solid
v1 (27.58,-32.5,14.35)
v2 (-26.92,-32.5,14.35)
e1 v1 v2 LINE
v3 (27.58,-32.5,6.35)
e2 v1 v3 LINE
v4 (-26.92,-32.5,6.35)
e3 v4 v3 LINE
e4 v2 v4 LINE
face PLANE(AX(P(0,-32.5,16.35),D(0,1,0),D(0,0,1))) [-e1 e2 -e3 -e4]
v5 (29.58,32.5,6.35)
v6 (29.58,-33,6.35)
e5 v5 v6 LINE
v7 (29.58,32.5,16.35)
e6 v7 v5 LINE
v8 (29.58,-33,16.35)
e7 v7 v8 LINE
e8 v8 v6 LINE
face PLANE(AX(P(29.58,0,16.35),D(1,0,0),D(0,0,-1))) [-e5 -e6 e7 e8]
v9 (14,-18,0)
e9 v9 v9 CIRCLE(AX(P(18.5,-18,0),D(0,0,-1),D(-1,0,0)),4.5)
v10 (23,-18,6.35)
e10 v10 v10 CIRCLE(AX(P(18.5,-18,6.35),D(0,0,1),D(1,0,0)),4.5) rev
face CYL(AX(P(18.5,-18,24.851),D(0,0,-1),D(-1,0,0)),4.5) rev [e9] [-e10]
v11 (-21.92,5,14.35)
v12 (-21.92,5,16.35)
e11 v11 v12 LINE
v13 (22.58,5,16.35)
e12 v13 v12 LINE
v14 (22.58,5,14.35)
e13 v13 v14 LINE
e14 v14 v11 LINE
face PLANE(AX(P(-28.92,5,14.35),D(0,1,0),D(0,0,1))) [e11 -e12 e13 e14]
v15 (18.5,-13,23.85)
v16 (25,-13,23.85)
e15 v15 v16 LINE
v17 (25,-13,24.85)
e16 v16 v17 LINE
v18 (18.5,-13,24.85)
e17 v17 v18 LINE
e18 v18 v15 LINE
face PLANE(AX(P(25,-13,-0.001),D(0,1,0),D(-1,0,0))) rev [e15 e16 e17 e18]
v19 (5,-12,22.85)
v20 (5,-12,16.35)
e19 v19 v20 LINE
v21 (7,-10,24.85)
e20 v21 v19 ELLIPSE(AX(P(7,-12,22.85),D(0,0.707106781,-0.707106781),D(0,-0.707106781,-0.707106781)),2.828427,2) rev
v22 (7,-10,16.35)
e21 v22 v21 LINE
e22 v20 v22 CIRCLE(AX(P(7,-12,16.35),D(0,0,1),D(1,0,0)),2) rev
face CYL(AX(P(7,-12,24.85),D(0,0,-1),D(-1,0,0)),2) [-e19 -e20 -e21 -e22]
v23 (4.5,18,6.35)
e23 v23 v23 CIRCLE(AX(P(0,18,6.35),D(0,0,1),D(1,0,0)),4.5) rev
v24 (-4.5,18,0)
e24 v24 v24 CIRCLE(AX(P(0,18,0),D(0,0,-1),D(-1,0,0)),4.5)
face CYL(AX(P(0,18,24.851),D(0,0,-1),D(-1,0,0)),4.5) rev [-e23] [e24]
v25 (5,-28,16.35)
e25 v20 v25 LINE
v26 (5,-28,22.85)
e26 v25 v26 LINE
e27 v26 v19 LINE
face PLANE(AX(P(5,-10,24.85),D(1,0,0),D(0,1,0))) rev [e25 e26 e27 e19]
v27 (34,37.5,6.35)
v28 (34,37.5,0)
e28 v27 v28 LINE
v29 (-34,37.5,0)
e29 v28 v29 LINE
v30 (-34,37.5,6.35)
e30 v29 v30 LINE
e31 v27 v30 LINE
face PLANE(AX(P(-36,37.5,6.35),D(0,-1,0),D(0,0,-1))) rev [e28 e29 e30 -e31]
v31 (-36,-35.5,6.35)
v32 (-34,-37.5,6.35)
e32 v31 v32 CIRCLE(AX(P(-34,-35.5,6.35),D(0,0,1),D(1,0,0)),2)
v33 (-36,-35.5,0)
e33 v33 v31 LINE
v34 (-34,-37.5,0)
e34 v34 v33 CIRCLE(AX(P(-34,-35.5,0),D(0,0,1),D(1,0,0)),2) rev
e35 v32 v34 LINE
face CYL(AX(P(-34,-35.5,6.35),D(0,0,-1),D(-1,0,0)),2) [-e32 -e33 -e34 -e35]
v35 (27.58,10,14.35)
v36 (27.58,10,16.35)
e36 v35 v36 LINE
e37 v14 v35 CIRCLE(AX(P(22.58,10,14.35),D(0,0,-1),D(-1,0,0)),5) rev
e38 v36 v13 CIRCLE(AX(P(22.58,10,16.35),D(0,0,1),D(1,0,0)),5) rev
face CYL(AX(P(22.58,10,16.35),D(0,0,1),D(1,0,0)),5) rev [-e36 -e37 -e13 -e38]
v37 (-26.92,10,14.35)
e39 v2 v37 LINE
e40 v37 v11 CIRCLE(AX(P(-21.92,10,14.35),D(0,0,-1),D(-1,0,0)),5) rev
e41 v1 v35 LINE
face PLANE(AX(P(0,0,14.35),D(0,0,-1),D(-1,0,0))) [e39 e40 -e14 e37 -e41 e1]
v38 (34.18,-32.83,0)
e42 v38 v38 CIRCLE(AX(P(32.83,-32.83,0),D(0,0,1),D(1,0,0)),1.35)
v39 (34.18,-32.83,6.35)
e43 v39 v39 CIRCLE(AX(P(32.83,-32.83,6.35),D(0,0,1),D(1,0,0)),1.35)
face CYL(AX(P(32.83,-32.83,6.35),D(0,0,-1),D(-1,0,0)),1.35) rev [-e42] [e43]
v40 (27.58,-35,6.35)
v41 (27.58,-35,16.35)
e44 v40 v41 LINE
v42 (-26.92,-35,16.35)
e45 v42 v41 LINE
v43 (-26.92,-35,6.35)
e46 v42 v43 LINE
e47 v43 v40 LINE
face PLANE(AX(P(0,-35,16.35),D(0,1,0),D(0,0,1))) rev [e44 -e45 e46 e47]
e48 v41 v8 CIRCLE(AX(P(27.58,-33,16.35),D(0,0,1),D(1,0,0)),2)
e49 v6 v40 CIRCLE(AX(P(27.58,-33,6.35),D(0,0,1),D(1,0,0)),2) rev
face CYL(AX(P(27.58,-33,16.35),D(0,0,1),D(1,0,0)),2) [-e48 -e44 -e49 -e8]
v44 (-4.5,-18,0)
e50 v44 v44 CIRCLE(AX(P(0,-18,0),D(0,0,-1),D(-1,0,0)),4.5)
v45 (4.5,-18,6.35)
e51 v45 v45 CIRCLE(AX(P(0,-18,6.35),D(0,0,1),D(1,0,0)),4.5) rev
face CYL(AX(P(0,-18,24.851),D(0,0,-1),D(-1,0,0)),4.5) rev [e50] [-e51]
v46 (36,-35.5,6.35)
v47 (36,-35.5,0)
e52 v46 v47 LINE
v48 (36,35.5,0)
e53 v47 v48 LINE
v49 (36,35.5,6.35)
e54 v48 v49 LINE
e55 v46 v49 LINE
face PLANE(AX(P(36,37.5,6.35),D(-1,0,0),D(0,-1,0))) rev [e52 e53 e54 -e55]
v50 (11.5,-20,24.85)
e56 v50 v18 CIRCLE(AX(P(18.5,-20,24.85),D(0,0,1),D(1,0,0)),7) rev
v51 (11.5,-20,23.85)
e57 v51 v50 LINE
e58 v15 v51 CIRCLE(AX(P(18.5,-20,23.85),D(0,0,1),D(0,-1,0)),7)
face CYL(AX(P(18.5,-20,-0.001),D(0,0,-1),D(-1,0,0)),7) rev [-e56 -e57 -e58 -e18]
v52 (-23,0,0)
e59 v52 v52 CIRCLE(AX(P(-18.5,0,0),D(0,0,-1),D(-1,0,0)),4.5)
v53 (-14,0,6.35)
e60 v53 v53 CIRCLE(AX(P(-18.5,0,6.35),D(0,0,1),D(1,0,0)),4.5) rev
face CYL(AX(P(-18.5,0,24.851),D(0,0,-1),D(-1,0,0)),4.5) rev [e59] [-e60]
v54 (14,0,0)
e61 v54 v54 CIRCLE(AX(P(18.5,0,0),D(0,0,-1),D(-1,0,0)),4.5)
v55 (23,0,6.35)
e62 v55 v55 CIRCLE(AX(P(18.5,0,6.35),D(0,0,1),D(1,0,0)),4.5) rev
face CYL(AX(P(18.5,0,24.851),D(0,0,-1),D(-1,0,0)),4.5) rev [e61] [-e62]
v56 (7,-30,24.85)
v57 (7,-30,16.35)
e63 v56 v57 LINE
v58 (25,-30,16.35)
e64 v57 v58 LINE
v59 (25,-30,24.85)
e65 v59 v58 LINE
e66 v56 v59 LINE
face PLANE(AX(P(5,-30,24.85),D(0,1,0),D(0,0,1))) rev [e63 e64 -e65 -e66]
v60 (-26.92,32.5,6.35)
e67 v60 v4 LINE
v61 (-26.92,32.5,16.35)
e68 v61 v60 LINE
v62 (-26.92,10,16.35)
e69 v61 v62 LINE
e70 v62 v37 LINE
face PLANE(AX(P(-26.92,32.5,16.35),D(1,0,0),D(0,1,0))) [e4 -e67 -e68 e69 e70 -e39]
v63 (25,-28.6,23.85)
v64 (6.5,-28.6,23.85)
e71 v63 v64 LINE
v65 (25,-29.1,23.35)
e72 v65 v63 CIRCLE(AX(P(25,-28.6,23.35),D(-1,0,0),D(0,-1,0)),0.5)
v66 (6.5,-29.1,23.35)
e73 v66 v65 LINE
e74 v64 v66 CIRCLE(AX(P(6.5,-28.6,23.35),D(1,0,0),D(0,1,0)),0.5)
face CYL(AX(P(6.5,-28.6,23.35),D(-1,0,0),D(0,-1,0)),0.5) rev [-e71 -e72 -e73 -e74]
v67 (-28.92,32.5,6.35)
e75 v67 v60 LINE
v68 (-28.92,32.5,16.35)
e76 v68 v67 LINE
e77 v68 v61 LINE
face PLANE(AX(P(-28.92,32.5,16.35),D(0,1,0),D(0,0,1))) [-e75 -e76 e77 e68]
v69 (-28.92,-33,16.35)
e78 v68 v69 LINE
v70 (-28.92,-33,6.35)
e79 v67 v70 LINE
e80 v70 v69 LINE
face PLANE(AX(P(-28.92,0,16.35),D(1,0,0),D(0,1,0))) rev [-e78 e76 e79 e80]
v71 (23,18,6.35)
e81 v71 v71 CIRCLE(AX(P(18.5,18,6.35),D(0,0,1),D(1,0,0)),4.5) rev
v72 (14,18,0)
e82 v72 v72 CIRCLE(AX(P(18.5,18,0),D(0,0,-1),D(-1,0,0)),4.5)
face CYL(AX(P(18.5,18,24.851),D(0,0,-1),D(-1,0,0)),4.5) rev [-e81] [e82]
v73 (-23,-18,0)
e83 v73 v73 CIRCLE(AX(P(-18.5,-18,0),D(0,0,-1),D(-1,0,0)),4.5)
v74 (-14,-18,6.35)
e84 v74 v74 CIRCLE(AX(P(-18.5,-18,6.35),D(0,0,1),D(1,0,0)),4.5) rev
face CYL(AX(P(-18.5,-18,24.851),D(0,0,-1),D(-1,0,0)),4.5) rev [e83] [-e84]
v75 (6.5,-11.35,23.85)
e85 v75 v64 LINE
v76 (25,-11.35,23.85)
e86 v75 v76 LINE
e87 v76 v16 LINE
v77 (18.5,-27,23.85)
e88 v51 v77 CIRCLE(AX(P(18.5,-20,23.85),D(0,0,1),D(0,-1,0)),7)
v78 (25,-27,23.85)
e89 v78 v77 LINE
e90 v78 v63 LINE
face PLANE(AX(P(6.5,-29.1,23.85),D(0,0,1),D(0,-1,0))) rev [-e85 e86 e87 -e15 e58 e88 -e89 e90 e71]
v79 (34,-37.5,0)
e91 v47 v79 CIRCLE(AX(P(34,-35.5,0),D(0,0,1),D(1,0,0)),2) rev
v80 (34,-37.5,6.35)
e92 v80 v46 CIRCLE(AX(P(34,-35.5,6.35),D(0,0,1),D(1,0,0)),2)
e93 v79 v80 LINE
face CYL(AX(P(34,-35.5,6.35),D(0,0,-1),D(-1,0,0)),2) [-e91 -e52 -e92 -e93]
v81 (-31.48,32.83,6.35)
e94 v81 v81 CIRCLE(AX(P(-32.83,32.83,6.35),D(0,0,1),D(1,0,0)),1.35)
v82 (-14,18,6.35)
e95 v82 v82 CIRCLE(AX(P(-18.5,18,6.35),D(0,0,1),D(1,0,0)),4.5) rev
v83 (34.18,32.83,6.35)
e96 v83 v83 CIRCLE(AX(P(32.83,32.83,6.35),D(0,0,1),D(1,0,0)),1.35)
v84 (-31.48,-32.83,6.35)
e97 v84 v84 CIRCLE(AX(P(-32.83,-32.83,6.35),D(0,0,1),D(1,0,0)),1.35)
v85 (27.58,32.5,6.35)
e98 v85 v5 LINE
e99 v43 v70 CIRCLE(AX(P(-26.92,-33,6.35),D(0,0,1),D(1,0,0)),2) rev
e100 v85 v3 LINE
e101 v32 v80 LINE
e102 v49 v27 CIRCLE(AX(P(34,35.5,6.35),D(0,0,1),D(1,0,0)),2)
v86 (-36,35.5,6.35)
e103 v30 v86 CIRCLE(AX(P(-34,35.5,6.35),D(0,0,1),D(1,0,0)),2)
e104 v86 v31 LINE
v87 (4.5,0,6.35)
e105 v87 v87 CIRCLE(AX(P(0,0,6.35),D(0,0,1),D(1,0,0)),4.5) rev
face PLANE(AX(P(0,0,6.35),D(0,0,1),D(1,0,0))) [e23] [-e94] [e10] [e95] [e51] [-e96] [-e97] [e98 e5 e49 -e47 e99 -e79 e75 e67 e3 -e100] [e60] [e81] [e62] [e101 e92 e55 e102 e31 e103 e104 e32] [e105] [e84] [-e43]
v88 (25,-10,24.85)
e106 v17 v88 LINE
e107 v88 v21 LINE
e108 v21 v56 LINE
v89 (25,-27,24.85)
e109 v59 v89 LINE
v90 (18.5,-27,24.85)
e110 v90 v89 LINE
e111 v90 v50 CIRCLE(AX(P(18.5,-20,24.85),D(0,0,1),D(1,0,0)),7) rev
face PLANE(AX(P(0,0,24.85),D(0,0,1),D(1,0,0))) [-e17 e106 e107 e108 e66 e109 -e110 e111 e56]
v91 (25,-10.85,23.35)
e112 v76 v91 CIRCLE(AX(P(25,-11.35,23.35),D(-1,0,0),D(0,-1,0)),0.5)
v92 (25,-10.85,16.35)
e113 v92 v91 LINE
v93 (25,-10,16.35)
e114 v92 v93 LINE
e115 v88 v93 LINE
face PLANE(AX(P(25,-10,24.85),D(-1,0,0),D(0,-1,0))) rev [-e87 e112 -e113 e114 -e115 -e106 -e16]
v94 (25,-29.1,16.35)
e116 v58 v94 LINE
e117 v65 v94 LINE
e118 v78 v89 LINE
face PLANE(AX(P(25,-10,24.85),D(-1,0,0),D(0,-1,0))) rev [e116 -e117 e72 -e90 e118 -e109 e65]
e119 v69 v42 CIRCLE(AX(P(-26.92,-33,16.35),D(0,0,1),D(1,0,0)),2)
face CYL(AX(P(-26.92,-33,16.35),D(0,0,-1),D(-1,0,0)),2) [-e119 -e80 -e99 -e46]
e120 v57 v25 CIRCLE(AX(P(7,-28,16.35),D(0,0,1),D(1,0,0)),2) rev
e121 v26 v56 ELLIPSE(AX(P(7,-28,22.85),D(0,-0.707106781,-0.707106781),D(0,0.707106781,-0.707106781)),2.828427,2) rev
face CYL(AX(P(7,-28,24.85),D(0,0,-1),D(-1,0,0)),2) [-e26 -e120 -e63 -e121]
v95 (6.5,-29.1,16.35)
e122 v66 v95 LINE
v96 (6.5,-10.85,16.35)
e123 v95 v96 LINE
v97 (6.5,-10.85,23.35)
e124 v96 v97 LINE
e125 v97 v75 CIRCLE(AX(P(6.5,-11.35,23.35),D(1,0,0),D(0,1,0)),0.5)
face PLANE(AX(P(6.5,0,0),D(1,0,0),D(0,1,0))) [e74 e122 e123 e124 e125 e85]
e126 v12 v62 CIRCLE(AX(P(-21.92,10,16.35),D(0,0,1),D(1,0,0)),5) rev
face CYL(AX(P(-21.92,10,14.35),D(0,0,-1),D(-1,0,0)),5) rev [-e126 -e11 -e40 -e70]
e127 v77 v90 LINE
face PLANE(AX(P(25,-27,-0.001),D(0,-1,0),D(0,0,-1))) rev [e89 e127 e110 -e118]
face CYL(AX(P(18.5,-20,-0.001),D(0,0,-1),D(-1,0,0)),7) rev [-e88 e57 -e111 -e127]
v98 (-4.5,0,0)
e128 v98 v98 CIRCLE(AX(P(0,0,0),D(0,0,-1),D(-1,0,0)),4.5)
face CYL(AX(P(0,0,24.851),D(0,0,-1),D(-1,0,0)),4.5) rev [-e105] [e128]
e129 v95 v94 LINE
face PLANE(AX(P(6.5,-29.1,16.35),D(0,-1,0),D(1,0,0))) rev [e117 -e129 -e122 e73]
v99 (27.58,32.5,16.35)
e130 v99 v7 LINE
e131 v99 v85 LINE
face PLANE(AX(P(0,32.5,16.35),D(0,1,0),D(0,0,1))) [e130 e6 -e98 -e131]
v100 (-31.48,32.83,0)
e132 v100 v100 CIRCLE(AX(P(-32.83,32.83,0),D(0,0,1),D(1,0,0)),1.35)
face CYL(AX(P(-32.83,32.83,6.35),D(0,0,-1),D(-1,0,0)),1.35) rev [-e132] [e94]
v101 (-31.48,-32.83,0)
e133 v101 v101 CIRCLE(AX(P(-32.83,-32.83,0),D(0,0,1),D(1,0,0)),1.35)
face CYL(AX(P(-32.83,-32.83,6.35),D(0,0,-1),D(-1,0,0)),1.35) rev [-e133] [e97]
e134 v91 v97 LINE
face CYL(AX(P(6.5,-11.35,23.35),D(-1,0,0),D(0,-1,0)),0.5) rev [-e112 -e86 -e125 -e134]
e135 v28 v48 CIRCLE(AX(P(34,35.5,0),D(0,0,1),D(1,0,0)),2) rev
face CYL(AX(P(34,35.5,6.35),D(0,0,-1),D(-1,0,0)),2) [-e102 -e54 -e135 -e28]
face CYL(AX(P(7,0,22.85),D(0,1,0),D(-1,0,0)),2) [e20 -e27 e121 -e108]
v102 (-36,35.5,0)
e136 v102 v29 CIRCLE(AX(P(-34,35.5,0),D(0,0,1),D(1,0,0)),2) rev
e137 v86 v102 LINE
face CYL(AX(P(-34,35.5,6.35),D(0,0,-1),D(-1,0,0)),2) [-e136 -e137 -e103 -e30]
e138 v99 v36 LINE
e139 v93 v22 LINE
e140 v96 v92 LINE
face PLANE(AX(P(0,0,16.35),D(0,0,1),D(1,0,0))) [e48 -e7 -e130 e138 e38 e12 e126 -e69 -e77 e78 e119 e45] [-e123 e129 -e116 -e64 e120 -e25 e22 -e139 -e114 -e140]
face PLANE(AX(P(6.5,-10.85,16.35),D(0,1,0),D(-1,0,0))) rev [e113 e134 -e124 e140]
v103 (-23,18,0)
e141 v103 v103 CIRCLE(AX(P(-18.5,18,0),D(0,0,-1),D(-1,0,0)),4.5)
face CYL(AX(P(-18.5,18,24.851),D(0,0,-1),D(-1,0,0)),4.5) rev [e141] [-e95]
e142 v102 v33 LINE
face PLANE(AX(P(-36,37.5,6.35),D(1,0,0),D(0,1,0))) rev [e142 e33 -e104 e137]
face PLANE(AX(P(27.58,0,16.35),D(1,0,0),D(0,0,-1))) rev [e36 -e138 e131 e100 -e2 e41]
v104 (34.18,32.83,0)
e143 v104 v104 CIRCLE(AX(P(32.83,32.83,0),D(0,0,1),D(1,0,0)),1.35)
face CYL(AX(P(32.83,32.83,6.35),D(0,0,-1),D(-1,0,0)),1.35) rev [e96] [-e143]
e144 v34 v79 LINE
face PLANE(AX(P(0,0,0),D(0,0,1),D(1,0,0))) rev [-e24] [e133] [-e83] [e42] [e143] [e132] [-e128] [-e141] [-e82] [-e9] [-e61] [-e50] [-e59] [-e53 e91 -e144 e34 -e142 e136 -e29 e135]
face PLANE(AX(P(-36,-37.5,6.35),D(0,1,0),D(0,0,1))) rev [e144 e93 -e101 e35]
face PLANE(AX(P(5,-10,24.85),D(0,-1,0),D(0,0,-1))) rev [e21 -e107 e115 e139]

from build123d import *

# Parameters (mm, degrees)
SKETCH1_W           = 72
SKETCH1_H           = 75
SKETCH1_R           = 1.35
BOSS_EXTRUDE1_DEPTH = 6.35
BOSS_EXTRUDE2_DEPTH = 10
SKETCH3_W           = 58.5
SKETCH3_H           = 40
BOSS_EXTRUDE3_DEPTH = 2
FILLET1_R           = 5
SKETCH4_W           = 20
SKETCH4_H           = 20
BOSS_EXTRUDE4_DEPTH = 8.5
SKETCH5_W           = 7.5
SKETCH5_H           = 18.25
CUT_EXTRUDE1_DEPTH  = 18.5
FILLET2_R           = 0.5
FILLET3_R           = 2
FILLET4_R           = 2
CUT_EXTRUDE2_REACH  = 59.617
SKETCH6_W           = 13.5
SKETCH6_H           = 14
FILLET5_R           = 7
CUT_EXTRUDE3_REACH  = 59.617
SKETCH7_R           = 4.5


with BuildPart() as part:
    # Sketch1 → Boss-Extrude1 (new body)
    with BuildSketch(Plane.XY):
        Rectangle(SKETCH1_W, SKETCH1_H)
        with Locations((-32.83, 32.83)):
            Circle(SKETCH1_R, mode=Mode.SUBTRACT)
        with Locations((-32.83, -32.83)):
            Circle(SKETCH1_R, mode=Mode.SUBTRACT)
        with Locations((32.83, 32.83)):
            Circle(SKETCH1_R, mode=Mode.SUBTRACT)
        with Locations((32.83, -32.83)):
            Circle(SKETCH1_R, mode=Mode.SUBTRACT)
    extrude(amount=BOSS_EXTRUDE1_DEPTH)

    # Sketch2 → Boss-Extrude2 (add)
    with BuildSketch(Plane.XY.offset(6.35)):
        Polygon((-26.92, 32.5), (-28.92, 32.5), (-28.92, -35), (29.58, -35), (29.58, 32.5), (27.58, 32.5), (27.58, -32.5), (-26.92, -32.5), align=None)
    extrude(amount=BOSS_EXTRUDE2_DEPTH)

    # Sketch3 → Boss-Extrude3 (add)
    with BuildSketch(Plane.XY.offset(16.35)):
        with Locations((0.33, -15)):
            Rectangle(SKETCH3_W, SKETCH3_H)
    extrude(amount=-BOSS_EXTRUDE3_DEPTH)

    # Fillet1
    fillet1_edges = [part.edges().sort_by_distance(p)[0] for p in [
        (-26.92, 5, 15.35),
        (27.58, 5, 15.35),
    ]]
    fillet(fillet1_edges, radius=FILLET1_R)

    # Sketch4 → Boss-Extrude4 (add)
    with BuildSketch(Plane.XY.offset(16.35)):
        with Locations((15, -20)):
            Rectangle(SKETCH4_W, SKETCH4_H)
    extrude(amount=BOSS_EXTRUDE4_DEPTH)

    # Sketch5 → Cut-Extrude1 (cut)
    with BuildSketch(Plane(origin=(25, 0, 0), x_dir=(0, 0, -1), z_dir=(1, 0, 0))):
        with Locations((-20.1, -19.975)):
            Rectangle(SKETCH5_W, SKETCH5_H)
    extrude(amount=-CUT_EXTRUDE1_DEPTH, mode=Mode.SUBTRACT)

    # Fillet2
    fillet2_edges = [part.edges().sort_by_distance(p)[0] for p in [
        (15.75, -29.1, 23.85),
        (15.75, -10.85, 23.85),
    ]]
    fillet(fillet2_edges, radius=FILLET2_R)

    # Fillet3
    fillet3_edges = [part.edges().sort_by_distance(p)[0] for p in [
        (-28.92, -35, 11.35),
        (29.58, -35, 11.35),
        (36, -37.5, 3.175),
        (-36, -37.5, 3.175),
        (-36, 37.5, 3.175),
        (36, 37.5, 3.175),
    ]]
    fillet(fillet3_edges, radius=FILLET3_R)

    # Fillet4
    fillet4_edges = [part.edges().sort_by_distance(p)[0] for p in [
        (5, -10, 20.6),
        (5, -30, 20.6),
        (5, -20, 24.85),
    ]]
    fillet(fillet4_edges, radius=FILLET4_R)

    # Sketch6 → Cut-Extrude2 (cut, up to next)
    with BuildSketch(Plane.XY.offset(24.85), mode=Mode.PRIVATE) as cut_extrude2_sk1:
        with Locations((18.25, -20)):
            Rectangle(SKETCH6_W, SKETCH6_H)
    cut_extrude2_tool1 = extrude(cut_extrude2_sk1.sketch, amount=-CUT_EXTRUDE2_REACH, mode=Mode.PRIVATE) & part.part
    add(cut_extrude2_tool1.solids().sort_by_distance((18.25, -20, 24.85))[0], mode=Mode.SUBTRACT)

    # Fillet5
    fillet5_edges = [part.edges().sort_by_distance(p)[0] for p in [
        (11.5, -27, 24.35),
        (11.5, -13, 24.35),
    ]]
    fillet(fillet5_edges, radius=FILLET5_R - 0.0001)  # a hair under: the kernel refuses the full size

    # Sketch7 → Cut-Extrude3 (cut, up to next)
    with BuildSketch(Plane(origin=(0, 0, 0), x_dir=(-1, 0, 0), z_dir=(0, 0, -1)), mode=Mode.PRIVATE) as cut_extrude3_sk1:
        with Locations((-18.5, 18)):
            Circle(SKETCH7_R)
    cut_extrude3_tool1 = extrude(cut_extrude3_sk1.sketch, amount=-CUT_EXTRUDE3_REACH, mode=Mode.PRIVATE) & part.part
    # Sketch7 → Cut-Extrude3 (cut, up to next)
    with BuildSketch(Plane(origin=(0, 0, 0), x_dir=(-1, 0, 0), z_dir=(0, 0, -1)), mode=Mode.PRIVATE) as cut_extrude3_sk2:
        with Locations((0, 18)):
            Circle(SKETCH7_R)
    cut_extrude3_tool2 = extrude(cut_extrude3_sk2.sketch, amount=-CUT_EXTRUDE3_REACH, mode=Mode.PRIVATE) & part.part
    # Sketch7 → Cut-Extrude3 (cut, up to next)
    with BuildSketch(Plane(origin=(0, 0, 0), x_dir=(-1, 0, 0), z_dir=(0, 0, -1)), mode=Mode.PRIVATE) as cut_extrude3_sk3:
        with Locations((18.5, 18)):
            Circle(SKETCH7_R)
    cut_extrude3_tool3 = extrude(cut_extrude3_sk3.sketch, amount=-CUT_EXTRUDE3_REACH, mode=Mode.PRIVATE) & part.part
    # Sketch7 → Cut-Extrude3 (cut, up to next)
    with BuildSketch(Plane(origin=(0, 0, 0), x_dir=(-1, 0, 0), z_dir=(0, 0, -1)), mode=Mode.PRIVATE) as cut_extrude3_sk4:
        with Locations((-18.5, 0)):
            Circle(SKETCH7_R)
    cut_extrude3_tool4 = extrude(cut_extrude3_sk4.sketch, amount=-CUT_EXTRUDE3_REACH, mode=Mode.PRIVATE) & part.part
    # Sketch7 → Cut-Extrude3 (cut, up to next)
    with BuildSketch(Plane(origin=(0, 0, 0), x_dir=(-1, 0, 0), z_dir=(0, 0, -1)), mode=Mode.PRIVATE) as cut_extrude3_sk5:
        Circle(SKETCH7_R)
    cut_extrude3_tool5 = extrude(cut_extrude3_sk5.sketch, amount=-CUT_EXTRUDE3_REACH, mode=Mode.PRIVATE) & part.part
    # Sketch7 → Cut-Extrude3 (cut, up to next)
    with BuildSketch(Plane(origin=(0, 0, 0), x_dir=(-1, 0, 0), z_dir=(0, 0, -1)), mode=Mode.PRIVATE) as cut_extrude3_sk6:
        with Locations((18.5, 0)):
            Circle(SKETCH7_R)
    cut_extrude3_tool6 = extrude(cut_extrude3_sk6.sketch, amount=-CUT_EXTRUDE3_REACH, mode=Mode.PRIVATE) & part.part
    # Sketch7 → Cut-Extrude3 (cut, up to next)
    with BuildSketch(Plane(origin=(0, 0, 0), x_dir=(-1, 0, 0), z_dir=(0, 0, -1)), mode=Mode.PRIVATE) as cut_extrude3_sk7:
        with Locations((0, -18)):
            Circle(SKETCH7_R)
    cut_extrude3_tool7 = extrude(cut_extrude3_sk7.sketch, amount=-CUT_EXTRUDE3_REACH, mode=Mode.PRIVATE) & part.part
    # Sketch7 → Cut-Extrude3 (cut, up to next)
    with BuildSketch(Plane(origin=(0, 0, 0), x_dir=(-1, 0, 0), z_dir=(0, 0, -1)), mode=Mode.PRIVATE) as cut_extrude3_sk8:
        with Locations((18.5, -18)):
            Circle(SKETCH7_R)
    cut_extrude3_tool8 = extrude(cut_extrude3_sk8.sketch, amount=-CUT_EXTRUDE3_REACH, mode=Mode.PRIVATE) & part.part
    # Sketch7 → Cut-Extrude3 (cut, up to next)
    with BuildSketch(Plane(origin=(0, 0, 0), x_dir=(-1, 0, 0), z_dir=(0, 0, -1)), mode=Mode.PRIVATE) as cut_extrude3_sk9:
        with Locations((-18.5, -18)):
            Circle(SKETCH7_R)
    cut_extrude3_tool9 = extrude(cut_extrude3_sk9.sketch, amount=-CUT_EXTRUDE3_REACH, mode=Mode.PRIVATE) & part.part
    add(cut_extrude3_tool1.solids().sort_by_distance((18.5, 18, 0))[0], mode=Mode.SUBTRACT)
    add(cut_extrude3_tool2.solids().sort_by_distance((0, 18, 0))[0], mode=Mode.SUBTRACT)
    add(cut_extrude3_tool3.solids().sort_by_distance((-18.5, 18, 0))[0], mode=Mode.SUBTRACT)
    add(cut_extrude3_tool4.solids().sort_by_distance((18.5, 0, 0))[0], mode=Mode.SUBTRACT)
    add(cut_extrude3_tool5.solids().sort_by_distance((0, 0, 0))[0], mode=Mode.SUBTRACT)
    add(cut_extrude3_tool6.solids().sort_by_distance((-18.5, 0, 0))[0], mode=Mode.SUBTRACT)
    add(cut_extrude3_tool7.solids().sort_by_distance((0, -18, 0))[0], mode=Mode.SUBTRACT)
    add(cut_extrude3_tool8.solids().sort_by_distance((-18.5, -18, 0))[0], mode=Mode.SUBTRACT)
    add(cut_extrude3_tool9.solids().sort_by_distance((18.5, -18, 0))[0], mode=Mode.SUBTRACT)


solid = part.part
